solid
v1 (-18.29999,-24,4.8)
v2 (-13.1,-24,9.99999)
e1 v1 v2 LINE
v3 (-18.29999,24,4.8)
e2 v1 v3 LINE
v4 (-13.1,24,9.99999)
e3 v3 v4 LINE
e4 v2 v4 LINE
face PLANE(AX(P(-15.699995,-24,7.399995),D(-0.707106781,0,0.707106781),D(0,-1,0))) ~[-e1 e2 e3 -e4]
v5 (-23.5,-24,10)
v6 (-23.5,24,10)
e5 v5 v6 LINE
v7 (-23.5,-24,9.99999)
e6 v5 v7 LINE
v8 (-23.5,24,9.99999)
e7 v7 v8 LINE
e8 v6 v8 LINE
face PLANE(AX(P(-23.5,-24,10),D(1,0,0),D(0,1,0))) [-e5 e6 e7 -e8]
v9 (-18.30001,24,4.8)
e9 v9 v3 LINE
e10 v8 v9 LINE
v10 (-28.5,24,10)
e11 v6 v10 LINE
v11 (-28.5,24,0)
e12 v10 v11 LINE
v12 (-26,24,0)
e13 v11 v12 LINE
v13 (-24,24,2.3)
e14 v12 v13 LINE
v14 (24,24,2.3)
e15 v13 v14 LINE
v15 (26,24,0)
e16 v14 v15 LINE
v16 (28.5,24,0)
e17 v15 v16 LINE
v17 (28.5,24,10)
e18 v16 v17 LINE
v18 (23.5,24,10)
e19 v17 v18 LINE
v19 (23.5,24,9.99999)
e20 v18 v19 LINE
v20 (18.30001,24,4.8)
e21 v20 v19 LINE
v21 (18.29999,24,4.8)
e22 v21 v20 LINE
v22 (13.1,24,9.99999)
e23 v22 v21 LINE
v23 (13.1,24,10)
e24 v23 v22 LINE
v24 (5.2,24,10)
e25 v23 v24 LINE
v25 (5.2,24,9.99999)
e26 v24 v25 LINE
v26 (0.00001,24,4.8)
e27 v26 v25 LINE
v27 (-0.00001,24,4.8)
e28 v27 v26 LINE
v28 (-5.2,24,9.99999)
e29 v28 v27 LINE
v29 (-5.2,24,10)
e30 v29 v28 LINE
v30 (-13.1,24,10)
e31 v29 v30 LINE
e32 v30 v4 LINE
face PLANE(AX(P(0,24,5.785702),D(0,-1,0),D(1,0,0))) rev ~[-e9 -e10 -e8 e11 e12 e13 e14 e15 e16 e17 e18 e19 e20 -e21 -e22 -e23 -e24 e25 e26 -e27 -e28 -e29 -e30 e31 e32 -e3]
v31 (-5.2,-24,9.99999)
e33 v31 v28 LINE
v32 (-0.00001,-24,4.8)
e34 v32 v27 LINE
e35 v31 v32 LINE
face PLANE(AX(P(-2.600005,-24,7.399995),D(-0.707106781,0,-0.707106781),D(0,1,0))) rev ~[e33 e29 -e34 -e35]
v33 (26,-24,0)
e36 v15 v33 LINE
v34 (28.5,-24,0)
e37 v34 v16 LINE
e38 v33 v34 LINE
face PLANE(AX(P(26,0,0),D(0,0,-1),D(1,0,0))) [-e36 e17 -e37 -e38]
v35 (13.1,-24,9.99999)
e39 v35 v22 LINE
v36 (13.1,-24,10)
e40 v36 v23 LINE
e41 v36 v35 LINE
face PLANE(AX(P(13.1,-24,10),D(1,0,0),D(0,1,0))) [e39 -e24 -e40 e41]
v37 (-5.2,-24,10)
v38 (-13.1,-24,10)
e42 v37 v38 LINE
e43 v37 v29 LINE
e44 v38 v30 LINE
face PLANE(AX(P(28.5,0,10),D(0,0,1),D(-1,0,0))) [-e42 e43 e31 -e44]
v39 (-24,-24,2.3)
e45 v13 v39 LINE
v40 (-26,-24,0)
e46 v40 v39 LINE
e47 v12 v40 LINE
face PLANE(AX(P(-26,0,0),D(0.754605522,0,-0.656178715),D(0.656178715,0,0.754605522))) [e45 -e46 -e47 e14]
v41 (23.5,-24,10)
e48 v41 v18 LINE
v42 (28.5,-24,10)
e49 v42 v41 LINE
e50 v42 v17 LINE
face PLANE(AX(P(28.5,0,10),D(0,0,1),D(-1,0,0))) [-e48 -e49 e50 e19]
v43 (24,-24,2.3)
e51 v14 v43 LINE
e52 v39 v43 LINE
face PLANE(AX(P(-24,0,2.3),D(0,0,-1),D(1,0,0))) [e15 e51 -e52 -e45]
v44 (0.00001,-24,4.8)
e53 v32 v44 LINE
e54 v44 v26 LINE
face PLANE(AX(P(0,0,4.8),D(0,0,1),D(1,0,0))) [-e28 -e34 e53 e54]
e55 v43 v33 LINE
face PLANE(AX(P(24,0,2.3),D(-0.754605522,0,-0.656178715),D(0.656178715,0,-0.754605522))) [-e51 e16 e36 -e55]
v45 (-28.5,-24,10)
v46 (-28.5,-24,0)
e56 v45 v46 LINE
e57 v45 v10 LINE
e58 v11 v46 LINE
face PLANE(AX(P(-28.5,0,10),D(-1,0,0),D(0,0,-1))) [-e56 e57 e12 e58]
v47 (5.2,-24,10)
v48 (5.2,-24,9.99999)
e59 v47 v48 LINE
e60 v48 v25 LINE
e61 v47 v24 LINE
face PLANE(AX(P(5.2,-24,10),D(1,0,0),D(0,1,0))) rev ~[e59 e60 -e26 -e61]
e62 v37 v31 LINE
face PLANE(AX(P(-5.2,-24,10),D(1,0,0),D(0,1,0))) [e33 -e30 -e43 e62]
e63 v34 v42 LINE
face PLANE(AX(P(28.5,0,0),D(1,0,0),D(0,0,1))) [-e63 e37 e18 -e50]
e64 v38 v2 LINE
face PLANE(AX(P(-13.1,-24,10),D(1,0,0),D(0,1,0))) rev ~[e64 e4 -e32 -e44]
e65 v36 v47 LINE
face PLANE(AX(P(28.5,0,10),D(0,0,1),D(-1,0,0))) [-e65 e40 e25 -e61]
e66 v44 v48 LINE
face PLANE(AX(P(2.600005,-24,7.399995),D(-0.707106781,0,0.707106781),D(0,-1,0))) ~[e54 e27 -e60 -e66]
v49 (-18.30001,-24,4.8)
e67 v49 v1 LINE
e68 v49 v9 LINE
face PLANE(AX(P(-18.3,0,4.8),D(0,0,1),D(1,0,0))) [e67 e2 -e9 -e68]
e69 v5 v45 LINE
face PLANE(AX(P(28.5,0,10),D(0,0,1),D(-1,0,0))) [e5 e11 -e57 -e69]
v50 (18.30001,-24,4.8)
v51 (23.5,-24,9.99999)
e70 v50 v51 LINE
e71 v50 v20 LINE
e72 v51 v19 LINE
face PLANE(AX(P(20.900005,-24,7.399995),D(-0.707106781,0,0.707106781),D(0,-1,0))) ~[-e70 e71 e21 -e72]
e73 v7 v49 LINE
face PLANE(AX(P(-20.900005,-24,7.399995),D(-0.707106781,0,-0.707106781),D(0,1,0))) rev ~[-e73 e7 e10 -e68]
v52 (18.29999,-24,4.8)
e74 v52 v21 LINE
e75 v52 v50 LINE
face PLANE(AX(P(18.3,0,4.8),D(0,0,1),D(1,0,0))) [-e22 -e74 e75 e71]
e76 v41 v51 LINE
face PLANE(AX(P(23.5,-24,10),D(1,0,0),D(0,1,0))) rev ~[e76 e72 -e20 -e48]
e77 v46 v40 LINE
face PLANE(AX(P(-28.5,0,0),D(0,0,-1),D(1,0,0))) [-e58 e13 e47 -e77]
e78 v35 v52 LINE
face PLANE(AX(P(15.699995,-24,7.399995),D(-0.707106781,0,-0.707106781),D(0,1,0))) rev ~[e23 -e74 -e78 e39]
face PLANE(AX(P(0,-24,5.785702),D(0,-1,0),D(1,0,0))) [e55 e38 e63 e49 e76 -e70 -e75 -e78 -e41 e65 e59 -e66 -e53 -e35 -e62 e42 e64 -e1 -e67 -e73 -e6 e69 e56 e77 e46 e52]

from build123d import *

# Parameters (mm, degrees)
F1_DEPTH = 24
F3_W     = 10.4
F3_H     = 48
F4_DEPTH = 5.2
F5_SIZE  = 5.19999


# Not quite as in the source:
# - a fillet or chamfer is up to 0.001 mm smaller than in the source, because OpenCascade refuses the exact size


with BuildPart() as f1:
    # F0 (on Front) → F1 (new body, symmetric)
    with BuildSketch(Plane.XZ):
        Polygon((-28.5, 10), (-28.5, 0), (-26, 0), (-24, 2.3), (24, 2.3), (26, 0), (28.5, 0), (28.5, 10), align=None)
    extrude(amount=F1_DEPTH, both=True)

    # F3 (on offset) → F4 (cut)
    with BuildSketch(Plane.XY.offset(10)):
        with Locations((-18.3, 0)):
            Rectangle(F3_W, F3_H)
        Rectangle(F3_W, F3_H)
        with Locations((18.3, 0)):
            Rectangle(F3_W, F3_H)
    extrude(amount=-F4_DEPTH, mode=Mode.SUBTRACT)

    # F5 (size 5.2 in the source; OpenCascade refuses exactly that, so slightly less here)
    f5_edges = [f1.edges().sort_by_distance(p)[0] for p in [
        (-13.1, 0, 4.8),
        (-23.5, 0, 4.8),
        (-5.2, 0, 4.8),
        (5.2, 0, 4.8),
        (13.1, 0, 4.8),
        (23.5, 0, 4.8),
    ]]
    chamfer(f5_edges, length=F5_SIZE)


solid = f1.part
